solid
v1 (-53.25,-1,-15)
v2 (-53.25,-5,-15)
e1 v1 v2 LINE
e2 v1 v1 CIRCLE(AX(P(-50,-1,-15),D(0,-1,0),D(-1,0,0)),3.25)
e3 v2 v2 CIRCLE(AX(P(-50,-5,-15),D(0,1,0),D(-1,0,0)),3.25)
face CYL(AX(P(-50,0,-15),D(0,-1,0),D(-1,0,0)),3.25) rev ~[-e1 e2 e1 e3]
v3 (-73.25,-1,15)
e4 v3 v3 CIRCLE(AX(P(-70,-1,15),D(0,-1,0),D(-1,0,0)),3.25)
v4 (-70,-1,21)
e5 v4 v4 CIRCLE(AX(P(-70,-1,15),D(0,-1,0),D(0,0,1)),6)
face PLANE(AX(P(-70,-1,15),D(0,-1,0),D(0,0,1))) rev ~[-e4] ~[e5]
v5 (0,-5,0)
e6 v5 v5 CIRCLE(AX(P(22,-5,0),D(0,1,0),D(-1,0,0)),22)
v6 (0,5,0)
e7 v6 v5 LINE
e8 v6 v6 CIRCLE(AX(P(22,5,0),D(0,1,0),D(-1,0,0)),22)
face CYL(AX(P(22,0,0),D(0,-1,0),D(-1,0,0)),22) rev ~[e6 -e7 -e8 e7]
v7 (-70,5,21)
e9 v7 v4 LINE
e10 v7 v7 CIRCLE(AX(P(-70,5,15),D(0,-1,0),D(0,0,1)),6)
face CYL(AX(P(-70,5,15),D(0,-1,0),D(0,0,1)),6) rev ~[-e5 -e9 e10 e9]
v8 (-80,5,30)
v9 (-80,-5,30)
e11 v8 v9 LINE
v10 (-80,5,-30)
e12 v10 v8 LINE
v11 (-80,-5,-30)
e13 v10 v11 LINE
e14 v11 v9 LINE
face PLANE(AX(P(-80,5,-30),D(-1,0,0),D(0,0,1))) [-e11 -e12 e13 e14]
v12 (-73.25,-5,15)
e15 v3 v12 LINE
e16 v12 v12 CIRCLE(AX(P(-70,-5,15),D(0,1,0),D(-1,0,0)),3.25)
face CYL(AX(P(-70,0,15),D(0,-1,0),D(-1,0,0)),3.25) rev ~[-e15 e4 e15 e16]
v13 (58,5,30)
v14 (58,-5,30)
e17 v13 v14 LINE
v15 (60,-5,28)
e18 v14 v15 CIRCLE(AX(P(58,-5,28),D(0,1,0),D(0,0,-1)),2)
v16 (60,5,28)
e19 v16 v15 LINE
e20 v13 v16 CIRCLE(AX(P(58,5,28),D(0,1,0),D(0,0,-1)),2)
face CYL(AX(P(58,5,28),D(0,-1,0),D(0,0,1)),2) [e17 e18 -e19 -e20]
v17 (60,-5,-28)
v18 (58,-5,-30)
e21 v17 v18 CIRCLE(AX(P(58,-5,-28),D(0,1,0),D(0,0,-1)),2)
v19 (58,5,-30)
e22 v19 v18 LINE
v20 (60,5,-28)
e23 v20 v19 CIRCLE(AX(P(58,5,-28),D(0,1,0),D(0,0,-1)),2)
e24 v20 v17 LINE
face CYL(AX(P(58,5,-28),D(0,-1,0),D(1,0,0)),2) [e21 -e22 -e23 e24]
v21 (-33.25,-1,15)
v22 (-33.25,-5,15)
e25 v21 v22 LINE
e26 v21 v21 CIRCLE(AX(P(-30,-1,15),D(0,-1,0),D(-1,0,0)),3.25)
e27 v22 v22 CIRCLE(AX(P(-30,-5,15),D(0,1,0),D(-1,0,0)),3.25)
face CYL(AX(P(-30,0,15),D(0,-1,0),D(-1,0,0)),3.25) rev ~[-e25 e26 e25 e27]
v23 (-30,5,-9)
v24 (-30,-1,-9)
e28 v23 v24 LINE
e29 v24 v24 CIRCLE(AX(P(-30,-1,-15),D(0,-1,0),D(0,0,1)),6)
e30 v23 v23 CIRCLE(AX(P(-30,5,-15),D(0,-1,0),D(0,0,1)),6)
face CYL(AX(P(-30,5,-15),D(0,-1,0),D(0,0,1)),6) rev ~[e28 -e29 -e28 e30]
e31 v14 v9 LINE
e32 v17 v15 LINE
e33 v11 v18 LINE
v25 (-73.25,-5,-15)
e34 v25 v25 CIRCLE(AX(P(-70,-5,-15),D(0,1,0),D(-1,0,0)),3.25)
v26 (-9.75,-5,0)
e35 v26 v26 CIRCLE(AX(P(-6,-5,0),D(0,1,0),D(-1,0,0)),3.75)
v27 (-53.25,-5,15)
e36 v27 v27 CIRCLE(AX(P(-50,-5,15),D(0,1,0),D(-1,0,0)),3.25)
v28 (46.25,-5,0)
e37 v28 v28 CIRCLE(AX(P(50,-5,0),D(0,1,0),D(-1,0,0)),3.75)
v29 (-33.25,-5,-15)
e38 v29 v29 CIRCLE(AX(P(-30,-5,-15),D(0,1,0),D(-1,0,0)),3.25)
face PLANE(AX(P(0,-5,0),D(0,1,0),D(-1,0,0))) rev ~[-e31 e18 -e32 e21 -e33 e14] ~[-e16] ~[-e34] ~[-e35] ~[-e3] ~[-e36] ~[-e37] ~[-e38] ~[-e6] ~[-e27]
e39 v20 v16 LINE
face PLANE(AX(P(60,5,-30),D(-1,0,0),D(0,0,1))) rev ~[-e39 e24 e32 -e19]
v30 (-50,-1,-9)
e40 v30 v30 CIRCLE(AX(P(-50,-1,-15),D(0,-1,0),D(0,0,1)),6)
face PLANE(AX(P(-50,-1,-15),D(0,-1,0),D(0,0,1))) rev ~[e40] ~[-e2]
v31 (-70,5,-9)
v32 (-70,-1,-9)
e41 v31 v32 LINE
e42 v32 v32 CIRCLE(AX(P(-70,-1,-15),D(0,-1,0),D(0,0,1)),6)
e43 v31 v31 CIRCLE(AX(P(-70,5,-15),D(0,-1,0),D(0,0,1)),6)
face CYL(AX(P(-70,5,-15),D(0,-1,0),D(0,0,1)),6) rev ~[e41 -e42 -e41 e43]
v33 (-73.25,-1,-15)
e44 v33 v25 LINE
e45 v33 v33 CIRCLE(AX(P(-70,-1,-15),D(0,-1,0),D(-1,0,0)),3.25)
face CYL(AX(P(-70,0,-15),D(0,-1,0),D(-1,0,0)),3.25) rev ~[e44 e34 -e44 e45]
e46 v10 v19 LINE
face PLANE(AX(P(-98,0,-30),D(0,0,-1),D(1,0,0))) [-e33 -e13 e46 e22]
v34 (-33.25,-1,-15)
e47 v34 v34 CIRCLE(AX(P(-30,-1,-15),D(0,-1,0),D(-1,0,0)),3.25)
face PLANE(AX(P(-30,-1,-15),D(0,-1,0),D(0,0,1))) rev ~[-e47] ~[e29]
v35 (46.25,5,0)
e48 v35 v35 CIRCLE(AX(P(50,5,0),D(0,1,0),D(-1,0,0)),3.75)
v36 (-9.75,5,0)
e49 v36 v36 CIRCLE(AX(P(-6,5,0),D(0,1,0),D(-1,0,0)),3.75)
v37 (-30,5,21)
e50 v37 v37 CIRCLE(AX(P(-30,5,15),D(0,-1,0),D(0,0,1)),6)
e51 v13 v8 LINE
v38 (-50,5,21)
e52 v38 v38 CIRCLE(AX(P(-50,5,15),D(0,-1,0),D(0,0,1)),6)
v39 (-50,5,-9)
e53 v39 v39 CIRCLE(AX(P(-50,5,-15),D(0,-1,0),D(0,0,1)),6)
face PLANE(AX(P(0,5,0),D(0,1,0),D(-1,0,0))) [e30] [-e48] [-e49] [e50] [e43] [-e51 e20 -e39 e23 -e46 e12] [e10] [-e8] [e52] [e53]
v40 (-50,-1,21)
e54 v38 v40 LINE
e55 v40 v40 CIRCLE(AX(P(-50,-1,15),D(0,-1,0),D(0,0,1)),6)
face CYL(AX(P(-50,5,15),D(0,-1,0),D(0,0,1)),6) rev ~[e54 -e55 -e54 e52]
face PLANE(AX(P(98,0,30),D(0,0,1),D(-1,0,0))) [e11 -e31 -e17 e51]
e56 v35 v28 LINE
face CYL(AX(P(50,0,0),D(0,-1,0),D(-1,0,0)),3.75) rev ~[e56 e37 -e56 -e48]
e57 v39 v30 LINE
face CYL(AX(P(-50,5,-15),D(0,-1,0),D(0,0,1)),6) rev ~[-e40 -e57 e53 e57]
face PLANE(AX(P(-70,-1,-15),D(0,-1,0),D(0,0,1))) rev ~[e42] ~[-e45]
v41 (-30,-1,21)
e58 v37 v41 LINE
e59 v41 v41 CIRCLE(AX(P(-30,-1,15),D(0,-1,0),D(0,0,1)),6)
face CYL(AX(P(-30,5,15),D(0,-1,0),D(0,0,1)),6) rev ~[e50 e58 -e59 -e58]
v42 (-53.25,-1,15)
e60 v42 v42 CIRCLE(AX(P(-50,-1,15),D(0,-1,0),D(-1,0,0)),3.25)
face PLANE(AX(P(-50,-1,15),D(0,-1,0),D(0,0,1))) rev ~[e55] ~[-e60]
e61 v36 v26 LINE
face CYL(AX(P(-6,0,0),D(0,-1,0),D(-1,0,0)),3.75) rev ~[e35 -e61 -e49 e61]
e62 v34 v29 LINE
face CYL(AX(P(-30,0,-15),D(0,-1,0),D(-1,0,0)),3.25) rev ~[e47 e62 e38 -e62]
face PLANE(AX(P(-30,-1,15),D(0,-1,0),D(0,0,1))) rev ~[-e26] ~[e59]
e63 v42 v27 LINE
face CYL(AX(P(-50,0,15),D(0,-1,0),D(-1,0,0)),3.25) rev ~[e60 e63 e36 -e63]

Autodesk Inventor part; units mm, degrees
ref_plane "YZ Plane" through (0, 0, 0) normal (1, 0, 0) x (0, 1, 0)
ref_plane "XZ Plane" through (0, 0, 0) normal (0, 1, 0) x (-1, 0, 0)
ref_plane "XY Plane" through (0, 0, 0) normal (0, 0, 1) x (1, 0, 0)
sketch "Sketch1" plane through (0, 0, 0) normal (0, 1, 0) x (-1, 0, 0)
  line L0 (-98, 30) -> (98, 30)
  line L1 (100, 28) -> (100, -28)
  line L2 (98, -30) -> (-98, -30)
  line L3 (-100, -28) -> (-100, 28)
  line L4 (-100, 30) -> (100, -30) construction
  line L5 (100, 30) -> (-100, -30) construction
  arc A0 (-98, 30) -> (-100, 28) centre (-98, 28) ccw
  arc A1 (100, 28) -> (98, 30) centre (98, 28) ccw
  arc A2 (98, -30) -> (100, -28) centre (98, -28) ccw
  arc A3 (-100, -28) -> (-98, -30) centre (-98, -28) ccw
  circle A4 centre (-22, 0) radius 22
  circle A5 centre (-50, 0) radius 3.75
  circle A6 centre (6, 0) radius 3.75
  circle A7 centre (30, 15) radius 3.25
  circle A8 centre (50, 15) radius 3.25
  circle A9 centre (70, 15) radius 3.25
  circle A10 centre (30, -15) radius 3.25
  circle A11 centre (50, -15) radius 3.25
  circle A12 centre (70, -15) radius 3.25
  point P0 (0, 0)
  point P1 (-100, 0)
  dimension "d0" = 60
  dimension "d1" = 200
  dimension "d2" = 2
  dimension "d3" = 44
  dimension "d4" = 56
  dimension "d5" = 28
  dimension "d6" = 7.5
  dimension "d7" = 7.5
  dimension "d8" = 50
  dimension "d9" = 6.5
  dimension "d10" = 6.5
  dimension "d11" = 6.5
  dimension "d12" = 6.5
  dimension "d13" = 6.5
  dimension "d14" = 6.5
  dimension "d15" = 15
  dimension "d16" = 30
  dimension "d17" = 30
  dimension "d18" = 20
  dimension "d19" = 20
extrude "Plate1" add sketch "Sketch1" along normal mid plane 10
sketch "Sketch2" plane through (0, 5, 0) normal (0, 1, 0) x (1, 0, 0)
  line L0 (98, -30) -> (-98, -30) projected
  line L1 (100, 30) -> (60, 30)
  line L2 (60, 30) -> (60, -30)
  line L3 (60, -30) -> (100, -30)
  line L4 (100, -30) -> (100, 30)
  line L5 (100, 28) -> (100, -28) projected
  line L6 (-98, 30) -> (98, 30) projected
  point P0 (0, 0)
  dimension "d21" = 40
extrude "Cut1" cut sketch "Sketch2" against normal blind 10
fillet "Corner Round1" radius 2 2 edges at (60, 0, -30) (60, 0, 30)
sketch "Sketch3" plane through (0, 5, 0) normal (0, 1, 0) x (1, 0, 0)
  line L0 (-98, 30) -> (58, 30) construction
  line L1 (-100, -28) -> (-100, 28) construction
  line L2 (-100, 30) -> (-80, 30)
  line L3 (-80, 30) -> (-80, -30)
  line L4 (-80, -30) -> (-100, -30)
  line L5 (-100, -30) -> (-100, 30)
  circle A0 centre (-70, -15) radius 3.25 projected
  point P0 (0, 0)
  point P1 (-98, -30)
  dimension "d26" = 20
extrude "Cut2" cut sketch "Sketch3" against normal blind 10 contours L2 L3 L4 L5
sketch "Sketch4" plane through (0, 5, 0) normal (0, 1, 0) x (1, 0, 0)
  circle A0 centre (-70, 15) radius 3.25 projected
  circle A1 centre (-50, 15) radius 3.25 projected
  circle A2 centre (-30, 15) radius 3.25 projected
  circle A3 centre (-30, -15) radius 3.25 projected
  circle A4 centre (-50, -15) radius 3.25 projected
  circle A5 centre (-70, -15) radius 3.25 projected
  point P0 (0, 0)
hole "Hole1" at (-70, 5, -15) at (-50, 5, -15) at (-30, 5, -15) at (-30, 5, 15) at (-50, 5, 15) at (-70, 5, 15) direction (0, -1, 0) diameter 12 depth 6
equation "\"d7\" = d6"
equation "\"d10\" = d9"
equation "\"d11\" = d9"
equation "\"d12\" = d9"
equation "\"d13\" = d9"
equation "\"d14\" = d9"
equation "\"d22\" = Thickness"
equation "\"d27\" = Thickness"
equation "\"d20\" = Thickness"
equation "\"BendReliefDepth\" = 0.5 * Thickness"
equation "\"Thickness\" = 10"
properties part number "HCMUTE-CDT23-BAT_TRUC_DAN" material "Stainless Steel"
